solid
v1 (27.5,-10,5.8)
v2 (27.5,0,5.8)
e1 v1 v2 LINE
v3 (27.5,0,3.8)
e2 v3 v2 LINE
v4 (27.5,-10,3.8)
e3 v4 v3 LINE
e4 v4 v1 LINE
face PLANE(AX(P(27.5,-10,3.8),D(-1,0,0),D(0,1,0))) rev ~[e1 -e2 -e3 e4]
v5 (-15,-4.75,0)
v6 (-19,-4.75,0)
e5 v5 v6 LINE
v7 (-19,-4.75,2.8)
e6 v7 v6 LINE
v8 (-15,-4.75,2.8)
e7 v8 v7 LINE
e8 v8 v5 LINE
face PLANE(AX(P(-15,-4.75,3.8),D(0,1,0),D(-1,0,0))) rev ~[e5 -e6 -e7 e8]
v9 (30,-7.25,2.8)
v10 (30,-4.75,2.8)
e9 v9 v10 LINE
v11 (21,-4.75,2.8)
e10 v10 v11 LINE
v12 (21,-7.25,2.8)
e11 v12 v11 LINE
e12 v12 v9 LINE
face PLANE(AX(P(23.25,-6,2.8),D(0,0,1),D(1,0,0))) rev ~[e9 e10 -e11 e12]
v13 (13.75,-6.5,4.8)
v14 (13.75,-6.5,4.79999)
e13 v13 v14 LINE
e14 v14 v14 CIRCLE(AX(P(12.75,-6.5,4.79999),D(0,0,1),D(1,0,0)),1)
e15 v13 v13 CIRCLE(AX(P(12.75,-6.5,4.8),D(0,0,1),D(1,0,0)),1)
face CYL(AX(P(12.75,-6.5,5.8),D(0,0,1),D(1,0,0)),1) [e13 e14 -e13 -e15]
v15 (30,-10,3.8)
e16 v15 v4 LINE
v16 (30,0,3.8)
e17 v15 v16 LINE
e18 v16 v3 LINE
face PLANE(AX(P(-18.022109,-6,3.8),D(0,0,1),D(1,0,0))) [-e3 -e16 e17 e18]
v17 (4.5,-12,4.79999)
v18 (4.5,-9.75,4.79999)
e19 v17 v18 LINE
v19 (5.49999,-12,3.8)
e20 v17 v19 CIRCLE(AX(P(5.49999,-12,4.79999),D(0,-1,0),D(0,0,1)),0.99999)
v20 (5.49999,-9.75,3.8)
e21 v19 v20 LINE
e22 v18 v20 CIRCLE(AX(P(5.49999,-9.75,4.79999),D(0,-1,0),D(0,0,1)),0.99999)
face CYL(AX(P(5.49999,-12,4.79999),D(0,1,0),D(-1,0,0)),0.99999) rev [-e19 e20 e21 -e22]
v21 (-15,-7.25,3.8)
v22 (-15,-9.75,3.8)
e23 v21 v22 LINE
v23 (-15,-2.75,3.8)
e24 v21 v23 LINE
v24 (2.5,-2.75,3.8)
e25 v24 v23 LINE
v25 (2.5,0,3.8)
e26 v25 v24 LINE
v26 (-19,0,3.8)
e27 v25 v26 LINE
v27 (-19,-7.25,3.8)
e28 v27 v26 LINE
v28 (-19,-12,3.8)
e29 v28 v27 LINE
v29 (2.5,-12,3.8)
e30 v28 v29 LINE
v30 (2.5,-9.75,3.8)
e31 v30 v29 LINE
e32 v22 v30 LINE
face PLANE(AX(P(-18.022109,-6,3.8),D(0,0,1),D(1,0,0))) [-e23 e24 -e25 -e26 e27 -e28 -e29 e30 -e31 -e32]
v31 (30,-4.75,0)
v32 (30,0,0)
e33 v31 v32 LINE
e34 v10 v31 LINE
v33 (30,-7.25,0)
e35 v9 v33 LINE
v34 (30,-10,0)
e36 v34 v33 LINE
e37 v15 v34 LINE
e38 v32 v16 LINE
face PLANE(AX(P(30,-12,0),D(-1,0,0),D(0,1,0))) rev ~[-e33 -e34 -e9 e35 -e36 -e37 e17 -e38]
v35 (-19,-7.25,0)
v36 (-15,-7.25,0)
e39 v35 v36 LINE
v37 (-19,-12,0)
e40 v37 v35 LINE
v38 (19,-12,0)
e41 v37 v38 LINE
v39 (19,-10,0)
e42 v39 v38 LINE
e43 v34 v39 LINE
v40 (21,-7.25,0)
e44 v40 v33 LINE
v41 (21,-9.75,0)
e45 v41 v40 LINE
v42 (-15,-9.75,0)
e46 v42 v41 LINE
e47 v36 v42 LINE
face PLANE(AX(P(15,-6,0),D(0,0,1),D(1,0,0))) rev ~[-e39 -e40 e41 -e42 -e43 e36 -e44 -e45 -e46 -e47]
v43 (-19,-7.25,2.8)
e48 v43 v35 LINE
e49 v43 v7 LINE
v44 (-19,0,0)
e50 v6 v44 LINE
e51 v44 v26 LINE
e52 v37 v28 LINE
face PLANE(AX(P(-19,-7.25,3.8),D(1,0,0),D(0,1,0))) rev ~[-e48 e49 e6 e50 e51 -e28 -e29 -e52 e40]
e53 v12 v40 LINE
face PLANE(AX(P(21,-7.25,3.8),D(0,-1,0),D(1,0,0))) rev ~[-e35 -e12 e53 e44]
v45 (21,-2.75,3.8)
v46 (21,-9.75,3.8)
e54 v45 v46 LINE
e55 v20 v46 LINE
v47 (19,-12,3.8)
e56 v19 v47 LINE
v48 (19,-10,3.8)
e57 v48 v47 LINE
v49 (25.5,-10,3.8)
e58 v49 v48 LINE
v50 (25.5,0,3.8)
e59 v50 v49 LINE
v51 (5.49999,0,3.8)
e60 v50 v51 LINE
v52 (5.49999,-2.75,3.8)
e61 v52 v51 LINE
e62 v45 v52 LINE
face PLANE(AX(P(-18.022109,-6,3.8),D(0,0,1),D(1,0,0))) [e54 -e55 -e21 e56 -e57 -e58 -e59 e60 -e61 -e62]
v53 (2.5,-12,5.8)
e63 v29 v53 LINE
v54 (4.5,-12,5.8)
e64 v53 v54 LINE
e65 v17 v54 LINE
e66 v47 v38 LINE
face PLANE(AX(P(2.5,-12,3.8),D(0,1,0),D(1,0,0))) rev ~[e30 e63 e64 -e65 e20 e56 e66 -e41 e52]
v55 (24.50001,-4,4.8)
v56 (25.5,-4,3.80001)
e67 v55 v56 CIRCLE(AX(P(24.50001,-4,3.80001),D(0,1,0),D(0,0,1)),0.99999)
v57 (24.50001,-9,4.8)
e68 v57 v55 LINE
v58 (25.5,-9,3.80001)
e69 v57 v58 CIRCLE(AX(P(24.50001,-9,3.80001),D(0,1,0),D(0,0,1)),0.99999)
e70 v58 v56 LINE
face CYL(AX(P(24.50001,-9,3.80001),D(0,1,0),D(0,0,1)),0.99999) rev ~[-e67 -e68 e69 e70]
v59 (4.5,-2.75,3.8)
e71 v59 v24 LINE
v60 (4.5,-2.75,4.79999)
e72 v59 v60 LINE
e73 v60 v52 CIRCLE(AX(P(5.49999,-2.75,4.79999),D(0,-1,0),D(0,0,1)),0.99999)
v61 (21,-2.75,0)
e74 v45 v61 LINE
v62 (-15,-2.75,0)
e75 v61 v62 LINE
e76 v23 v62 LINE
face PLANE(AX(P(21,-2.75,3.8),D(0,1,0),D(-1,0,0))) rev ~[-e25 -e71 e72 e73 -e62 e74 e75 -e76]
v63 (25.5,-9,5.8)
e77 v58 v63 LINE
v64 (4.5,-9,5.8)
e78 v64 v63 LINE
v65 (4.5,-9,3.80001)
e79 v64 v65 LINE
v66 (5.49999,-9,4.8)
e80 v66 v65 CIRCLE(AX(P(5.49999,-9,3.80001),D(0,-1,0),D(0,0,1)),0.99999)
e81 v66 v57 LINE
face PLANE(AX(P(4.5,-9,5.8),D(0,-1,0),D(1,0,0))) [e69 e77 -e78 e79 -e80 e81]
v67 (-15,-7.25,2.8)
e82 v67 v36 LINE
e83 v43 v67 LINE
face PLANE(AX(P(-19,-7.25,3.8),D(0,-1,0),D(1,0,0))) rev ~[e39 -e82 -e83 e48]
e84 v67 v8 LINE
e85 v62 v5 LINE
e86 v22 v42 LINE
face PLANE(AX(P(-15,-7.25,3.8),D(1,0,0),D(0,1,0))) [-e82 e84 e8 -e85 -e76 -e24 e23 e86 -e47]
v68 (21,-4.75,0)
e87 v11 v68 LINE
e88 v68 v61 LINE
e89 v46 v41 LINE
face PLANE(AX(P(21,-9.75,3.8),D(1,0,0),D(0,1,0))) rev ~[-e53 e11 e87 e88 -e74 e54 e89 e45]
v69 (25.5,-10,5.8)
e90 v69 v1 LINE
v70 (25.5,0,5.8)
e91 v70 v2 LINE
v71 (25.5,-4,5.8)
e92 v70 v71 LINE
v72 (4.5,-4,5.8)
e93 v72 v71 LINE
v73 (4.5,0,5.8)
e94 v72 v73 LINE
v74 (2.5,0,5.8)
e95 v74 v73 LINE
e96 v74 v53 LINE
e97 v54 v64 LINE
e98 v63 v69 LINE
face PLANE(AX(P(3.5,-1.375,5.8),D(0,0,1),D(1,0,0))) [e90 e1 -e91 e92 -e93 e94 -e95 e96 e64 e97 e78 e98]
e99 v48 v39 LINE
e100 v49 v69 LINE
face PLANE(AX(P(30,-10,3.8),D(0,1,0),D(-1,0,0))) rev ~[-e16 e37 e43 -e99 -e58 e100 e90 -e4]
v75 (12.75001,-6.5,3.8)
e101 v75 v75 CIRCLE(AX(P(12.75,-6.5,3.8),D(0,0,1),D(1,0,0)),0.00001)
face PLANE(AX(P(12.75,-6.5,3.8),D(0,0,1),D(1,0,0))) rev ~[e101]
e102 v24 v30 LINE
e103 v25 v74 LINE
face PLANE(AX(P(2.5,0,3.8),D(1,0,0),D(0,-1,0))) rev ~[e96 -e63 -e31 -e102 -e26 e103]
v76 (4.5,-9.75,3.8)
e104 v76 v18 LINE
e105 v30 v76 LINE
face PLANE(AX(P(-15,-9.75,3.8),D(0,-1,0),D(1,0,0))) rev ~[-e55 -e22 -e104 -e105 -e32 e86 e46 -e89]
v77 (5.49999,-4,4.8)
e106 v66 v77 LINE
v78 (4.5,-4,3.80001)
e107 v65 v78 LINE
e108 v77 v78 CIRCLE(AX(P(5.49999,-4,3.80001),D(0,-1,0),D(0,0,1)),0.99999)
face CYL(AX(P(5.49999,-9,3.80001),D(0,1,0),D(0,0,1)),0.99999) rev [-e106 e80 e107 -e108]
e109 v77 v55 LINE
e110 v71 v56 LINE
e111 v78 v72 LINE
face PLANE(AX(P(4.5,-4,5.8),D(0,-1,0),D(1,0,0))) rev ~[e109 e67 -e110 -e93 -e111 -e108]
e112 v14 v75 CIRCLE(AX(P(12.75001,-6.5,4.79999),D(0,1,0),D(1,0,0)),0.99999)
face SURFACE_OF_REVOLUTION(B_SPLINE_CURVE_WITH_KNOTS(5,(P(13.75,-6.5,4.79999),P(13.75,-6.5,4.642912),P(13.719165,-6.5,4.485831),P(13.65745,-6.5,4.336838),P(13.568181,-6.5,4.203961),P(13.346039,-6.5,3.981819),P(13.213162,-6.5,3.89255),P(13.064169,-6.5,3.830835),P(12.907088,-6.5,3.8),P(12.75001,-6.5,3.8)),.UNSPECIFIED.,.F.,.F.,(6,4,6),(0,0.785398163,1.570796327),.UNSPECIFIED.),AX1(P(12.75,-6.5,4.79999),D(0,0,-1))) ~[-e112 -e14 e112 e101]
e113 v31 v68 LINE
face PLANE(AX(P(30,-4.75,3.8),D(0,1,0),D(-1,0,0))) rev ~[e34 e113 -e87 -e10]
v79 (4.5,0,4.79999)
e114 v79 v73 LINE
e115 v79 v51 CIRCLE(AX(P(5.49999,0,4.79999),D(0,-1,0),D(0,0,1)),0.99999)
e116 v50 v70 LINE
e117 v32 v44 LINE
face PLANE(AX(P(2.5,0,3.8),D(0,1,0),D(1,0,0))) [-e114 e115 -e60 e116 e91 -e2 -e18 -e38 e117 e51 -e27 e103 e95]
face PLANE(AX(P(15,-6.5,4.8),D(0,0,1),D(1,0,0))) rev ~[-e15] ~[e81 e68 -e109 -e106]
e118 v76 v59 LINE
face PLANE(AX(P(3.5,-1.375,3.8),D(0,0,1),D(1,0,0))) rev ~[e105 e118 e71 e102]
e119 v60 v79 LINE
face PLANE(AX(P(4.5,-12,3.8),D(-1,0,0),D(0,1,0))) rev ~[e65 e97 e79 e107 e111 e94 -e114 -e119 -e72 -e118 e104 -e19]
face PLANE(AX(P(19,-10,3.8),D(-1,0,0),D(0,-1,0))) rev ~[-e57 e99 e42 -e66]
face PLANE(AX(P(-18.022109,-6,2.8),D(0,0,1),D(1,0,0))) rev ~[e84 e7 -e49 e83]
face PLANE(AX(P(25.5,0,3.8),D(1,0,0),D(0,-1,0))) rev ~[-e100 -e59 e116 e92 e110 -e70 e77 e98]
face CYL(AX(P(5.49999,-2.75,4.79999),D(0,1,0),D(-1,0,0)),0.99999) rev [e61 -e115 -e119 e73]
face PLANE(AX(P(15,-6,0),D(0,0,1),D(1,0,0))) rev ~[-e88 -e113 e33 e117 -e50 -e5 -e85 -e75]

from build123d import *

# Parameters (mm, degrees)
F0_W     = 30
F0_H     = 12
F0_W_2   = 19
F1_DEPTH = 3.8
F2_W     = 1.9557817429
F2_H     = 2.5
F2_W_2   = 17.5
F2_H_2   = 2
F2_W_3   = 2
F2_W_4   = 16.5
F2_W_5   = 4.5
F2_W_6   = 2.5
F2_W_7   = 2.0442182571
F3_DEPTH = 25
F4_DEPTH = 1
F2_H_3   = 2.75
F2_H_4   = 2.25
F2_H_5   = 4.75
F2_H_6   = 0.25
F5_DEPTH = 2
F6_W     = 21
F6_H     = 5
F6_R     = 1
F7_DEPTH = 1
F8_DEPTH = 2
F9_R     = 0.99999


# Not quite as in the source:
# - a fillet or chamfer is up to 0.001 mm smaller than in the source, because OpenCascade refuses the exact size


with BuildPart() as f1:
    # F0 (on Top) → F1 (new body)
    with BuildSketch(Plane.XY):
        with Locations((15, -6)):
            Rectangle(F0_W, F0_H)
        with Locations((-9.5, -6)):
            Rectangle(F0_W_2, F0_H)
    extrude(amount=F1_DEPTH)

    # F2 (on face) → F3 (cut)
    with BuildSketch(Plane.XY.offset(3.8)):
        with Locations((-18.0221091285, -6)):
            Rectangle(F2_W, F2_H)
        with Locations((-6.25, -3.75)):
            Rectangle(F2_W_2, F2_H_2)
        with Locations((-6.25, -6)):
            Rectangle(F2_W_2, F2_H)
        with Locations((-6.25, -8.5)):
            Rectangle(F2_W_2, F2_H)
        with Locations((3.5, -3.75)):
            Rectangle(F2_W_3, F2_H_2)
        with Locations((3.5, -6)):
            Rectangle(F2_W_3, F2_H)
        with Locations((3.5, -8.5)):
            Rectangle(F2_W_3, F2_H)
        with Locations((12.75, -8.5)):
            Rectangle(F2_W_4, F2_H)
        with Locations((12.75, -6)):
            Rectangle(F2_W_4, F2_H)
        with Locations((12.75, -3.75)):
            Rectangle(F2_W_4, F2_H_2)
        with Locations((23.25, -6)):
            Rectangle(F2_W_5, F2_H)
        with Locations((26.5, -6)):
            Rectangle(F2_W_3, F2_H)
        with Locations((28.75, -6)):
            Rectangle(F2_W_6, F2_H)
        Polygon((19, -12), (30, -12), (30, -10), (27.5, -10), (25.5, -10), (19, -10), align=None)
        with Locations((-16.0221091285, -6)):
            Rectangle(F2_W_7, F2_H)
    extrude(amount=-F3_DEPTH, mode=Mode.SUBTRACT)

    # F2 (on face) → F4 (join)
    with BuildSketch(Plane.XY.offset(3.8)):
        with Locations((-18.0221091285, -6)):
            Rectangle(F2_W, F2_H)
        with Locations((23.25, -6)):
            Rectangle(F2_W_5, F2_H)
        with Locations((26.5, -6)):
            Rectangle(F2_W_3, F2_H)
        with Locations((28.75, -6)):
            Rectangle(F2_W_6, F2_H)
        with Locations((-16.0221091285, -6)):
            Rectangle(F2_W_7, F2_H)
    extrude(amount=-F4_DEPTH)

    # F2 (on face) → F5 (join)
    with BuildSketch(Plane.XY.offset(3.8)):
        with Locations((3.5, -1.375)):
            Rectangle(F2_W_3, F2_H_3)
        with Locations((3.5, -3.75)):
            Rectangle(F2_W_3, F2_H_2)
        with Locations((3.5, -6)):
            Rectangle(F2_W_3, F2_H)
        with Locations((3.5, -8.5)):
            Rectangle(F2_W_3, F2_H)
        with Locations((3.5, -10.875)):
            Rectangle(F2_W_3, F2_H_4)
        with Locations((26.5, -2.375)):
            Rectangle(F2_W_3, F2_H_5)
        with Locations((26.5, -6)):
            Rectangle(F2_W_3, F2_H)
        with Locations((26.5, -8.5)):
            Rectangle(F2_W_3, F2_H)
        with Locations((26.5, -9.875)):
            Rectangle(F2_W_3, F2_H_6)
    extrude(amount=F5_DEPTH)

    # F6 (on face) → F7 (join)
    with BuildSketch(Plane.XY.offset(5.8)):
        with Locations((15, -6.5)):
            Rectangle(F6_W, F6_H)
        with Locations((12.75, -6.5)):
            Circle(F6_R, mode=Mode.SUBTRACT)
    extrude(amount=-F7_DEPTH)

    # F6 (on face) → F8 (join)
    with BuildSketch(Plane.XY.offset(5.8)):
        with Locations((12.75, -6.5)):
            Circle(F6_R)
    extrude(amount=-F8_DEPTH)

    # F9 (radius 1 in the source; OpenCascade refuses exactly that, so slightly less here)
    f9_edges = [f1.edges().sort_by_distance(p)[0] for p in [
        (11.75, -6.5, 3.8),
        (25.5, -6.5, 4.8),
        (4.5, -6.5, 4.8),
        (4.5, -10.875, 3.8),
        (4.5, -1.375, 3.8),
    ]]
    fillet(f9_edges, radius=F9_R)


solid = f1.part
